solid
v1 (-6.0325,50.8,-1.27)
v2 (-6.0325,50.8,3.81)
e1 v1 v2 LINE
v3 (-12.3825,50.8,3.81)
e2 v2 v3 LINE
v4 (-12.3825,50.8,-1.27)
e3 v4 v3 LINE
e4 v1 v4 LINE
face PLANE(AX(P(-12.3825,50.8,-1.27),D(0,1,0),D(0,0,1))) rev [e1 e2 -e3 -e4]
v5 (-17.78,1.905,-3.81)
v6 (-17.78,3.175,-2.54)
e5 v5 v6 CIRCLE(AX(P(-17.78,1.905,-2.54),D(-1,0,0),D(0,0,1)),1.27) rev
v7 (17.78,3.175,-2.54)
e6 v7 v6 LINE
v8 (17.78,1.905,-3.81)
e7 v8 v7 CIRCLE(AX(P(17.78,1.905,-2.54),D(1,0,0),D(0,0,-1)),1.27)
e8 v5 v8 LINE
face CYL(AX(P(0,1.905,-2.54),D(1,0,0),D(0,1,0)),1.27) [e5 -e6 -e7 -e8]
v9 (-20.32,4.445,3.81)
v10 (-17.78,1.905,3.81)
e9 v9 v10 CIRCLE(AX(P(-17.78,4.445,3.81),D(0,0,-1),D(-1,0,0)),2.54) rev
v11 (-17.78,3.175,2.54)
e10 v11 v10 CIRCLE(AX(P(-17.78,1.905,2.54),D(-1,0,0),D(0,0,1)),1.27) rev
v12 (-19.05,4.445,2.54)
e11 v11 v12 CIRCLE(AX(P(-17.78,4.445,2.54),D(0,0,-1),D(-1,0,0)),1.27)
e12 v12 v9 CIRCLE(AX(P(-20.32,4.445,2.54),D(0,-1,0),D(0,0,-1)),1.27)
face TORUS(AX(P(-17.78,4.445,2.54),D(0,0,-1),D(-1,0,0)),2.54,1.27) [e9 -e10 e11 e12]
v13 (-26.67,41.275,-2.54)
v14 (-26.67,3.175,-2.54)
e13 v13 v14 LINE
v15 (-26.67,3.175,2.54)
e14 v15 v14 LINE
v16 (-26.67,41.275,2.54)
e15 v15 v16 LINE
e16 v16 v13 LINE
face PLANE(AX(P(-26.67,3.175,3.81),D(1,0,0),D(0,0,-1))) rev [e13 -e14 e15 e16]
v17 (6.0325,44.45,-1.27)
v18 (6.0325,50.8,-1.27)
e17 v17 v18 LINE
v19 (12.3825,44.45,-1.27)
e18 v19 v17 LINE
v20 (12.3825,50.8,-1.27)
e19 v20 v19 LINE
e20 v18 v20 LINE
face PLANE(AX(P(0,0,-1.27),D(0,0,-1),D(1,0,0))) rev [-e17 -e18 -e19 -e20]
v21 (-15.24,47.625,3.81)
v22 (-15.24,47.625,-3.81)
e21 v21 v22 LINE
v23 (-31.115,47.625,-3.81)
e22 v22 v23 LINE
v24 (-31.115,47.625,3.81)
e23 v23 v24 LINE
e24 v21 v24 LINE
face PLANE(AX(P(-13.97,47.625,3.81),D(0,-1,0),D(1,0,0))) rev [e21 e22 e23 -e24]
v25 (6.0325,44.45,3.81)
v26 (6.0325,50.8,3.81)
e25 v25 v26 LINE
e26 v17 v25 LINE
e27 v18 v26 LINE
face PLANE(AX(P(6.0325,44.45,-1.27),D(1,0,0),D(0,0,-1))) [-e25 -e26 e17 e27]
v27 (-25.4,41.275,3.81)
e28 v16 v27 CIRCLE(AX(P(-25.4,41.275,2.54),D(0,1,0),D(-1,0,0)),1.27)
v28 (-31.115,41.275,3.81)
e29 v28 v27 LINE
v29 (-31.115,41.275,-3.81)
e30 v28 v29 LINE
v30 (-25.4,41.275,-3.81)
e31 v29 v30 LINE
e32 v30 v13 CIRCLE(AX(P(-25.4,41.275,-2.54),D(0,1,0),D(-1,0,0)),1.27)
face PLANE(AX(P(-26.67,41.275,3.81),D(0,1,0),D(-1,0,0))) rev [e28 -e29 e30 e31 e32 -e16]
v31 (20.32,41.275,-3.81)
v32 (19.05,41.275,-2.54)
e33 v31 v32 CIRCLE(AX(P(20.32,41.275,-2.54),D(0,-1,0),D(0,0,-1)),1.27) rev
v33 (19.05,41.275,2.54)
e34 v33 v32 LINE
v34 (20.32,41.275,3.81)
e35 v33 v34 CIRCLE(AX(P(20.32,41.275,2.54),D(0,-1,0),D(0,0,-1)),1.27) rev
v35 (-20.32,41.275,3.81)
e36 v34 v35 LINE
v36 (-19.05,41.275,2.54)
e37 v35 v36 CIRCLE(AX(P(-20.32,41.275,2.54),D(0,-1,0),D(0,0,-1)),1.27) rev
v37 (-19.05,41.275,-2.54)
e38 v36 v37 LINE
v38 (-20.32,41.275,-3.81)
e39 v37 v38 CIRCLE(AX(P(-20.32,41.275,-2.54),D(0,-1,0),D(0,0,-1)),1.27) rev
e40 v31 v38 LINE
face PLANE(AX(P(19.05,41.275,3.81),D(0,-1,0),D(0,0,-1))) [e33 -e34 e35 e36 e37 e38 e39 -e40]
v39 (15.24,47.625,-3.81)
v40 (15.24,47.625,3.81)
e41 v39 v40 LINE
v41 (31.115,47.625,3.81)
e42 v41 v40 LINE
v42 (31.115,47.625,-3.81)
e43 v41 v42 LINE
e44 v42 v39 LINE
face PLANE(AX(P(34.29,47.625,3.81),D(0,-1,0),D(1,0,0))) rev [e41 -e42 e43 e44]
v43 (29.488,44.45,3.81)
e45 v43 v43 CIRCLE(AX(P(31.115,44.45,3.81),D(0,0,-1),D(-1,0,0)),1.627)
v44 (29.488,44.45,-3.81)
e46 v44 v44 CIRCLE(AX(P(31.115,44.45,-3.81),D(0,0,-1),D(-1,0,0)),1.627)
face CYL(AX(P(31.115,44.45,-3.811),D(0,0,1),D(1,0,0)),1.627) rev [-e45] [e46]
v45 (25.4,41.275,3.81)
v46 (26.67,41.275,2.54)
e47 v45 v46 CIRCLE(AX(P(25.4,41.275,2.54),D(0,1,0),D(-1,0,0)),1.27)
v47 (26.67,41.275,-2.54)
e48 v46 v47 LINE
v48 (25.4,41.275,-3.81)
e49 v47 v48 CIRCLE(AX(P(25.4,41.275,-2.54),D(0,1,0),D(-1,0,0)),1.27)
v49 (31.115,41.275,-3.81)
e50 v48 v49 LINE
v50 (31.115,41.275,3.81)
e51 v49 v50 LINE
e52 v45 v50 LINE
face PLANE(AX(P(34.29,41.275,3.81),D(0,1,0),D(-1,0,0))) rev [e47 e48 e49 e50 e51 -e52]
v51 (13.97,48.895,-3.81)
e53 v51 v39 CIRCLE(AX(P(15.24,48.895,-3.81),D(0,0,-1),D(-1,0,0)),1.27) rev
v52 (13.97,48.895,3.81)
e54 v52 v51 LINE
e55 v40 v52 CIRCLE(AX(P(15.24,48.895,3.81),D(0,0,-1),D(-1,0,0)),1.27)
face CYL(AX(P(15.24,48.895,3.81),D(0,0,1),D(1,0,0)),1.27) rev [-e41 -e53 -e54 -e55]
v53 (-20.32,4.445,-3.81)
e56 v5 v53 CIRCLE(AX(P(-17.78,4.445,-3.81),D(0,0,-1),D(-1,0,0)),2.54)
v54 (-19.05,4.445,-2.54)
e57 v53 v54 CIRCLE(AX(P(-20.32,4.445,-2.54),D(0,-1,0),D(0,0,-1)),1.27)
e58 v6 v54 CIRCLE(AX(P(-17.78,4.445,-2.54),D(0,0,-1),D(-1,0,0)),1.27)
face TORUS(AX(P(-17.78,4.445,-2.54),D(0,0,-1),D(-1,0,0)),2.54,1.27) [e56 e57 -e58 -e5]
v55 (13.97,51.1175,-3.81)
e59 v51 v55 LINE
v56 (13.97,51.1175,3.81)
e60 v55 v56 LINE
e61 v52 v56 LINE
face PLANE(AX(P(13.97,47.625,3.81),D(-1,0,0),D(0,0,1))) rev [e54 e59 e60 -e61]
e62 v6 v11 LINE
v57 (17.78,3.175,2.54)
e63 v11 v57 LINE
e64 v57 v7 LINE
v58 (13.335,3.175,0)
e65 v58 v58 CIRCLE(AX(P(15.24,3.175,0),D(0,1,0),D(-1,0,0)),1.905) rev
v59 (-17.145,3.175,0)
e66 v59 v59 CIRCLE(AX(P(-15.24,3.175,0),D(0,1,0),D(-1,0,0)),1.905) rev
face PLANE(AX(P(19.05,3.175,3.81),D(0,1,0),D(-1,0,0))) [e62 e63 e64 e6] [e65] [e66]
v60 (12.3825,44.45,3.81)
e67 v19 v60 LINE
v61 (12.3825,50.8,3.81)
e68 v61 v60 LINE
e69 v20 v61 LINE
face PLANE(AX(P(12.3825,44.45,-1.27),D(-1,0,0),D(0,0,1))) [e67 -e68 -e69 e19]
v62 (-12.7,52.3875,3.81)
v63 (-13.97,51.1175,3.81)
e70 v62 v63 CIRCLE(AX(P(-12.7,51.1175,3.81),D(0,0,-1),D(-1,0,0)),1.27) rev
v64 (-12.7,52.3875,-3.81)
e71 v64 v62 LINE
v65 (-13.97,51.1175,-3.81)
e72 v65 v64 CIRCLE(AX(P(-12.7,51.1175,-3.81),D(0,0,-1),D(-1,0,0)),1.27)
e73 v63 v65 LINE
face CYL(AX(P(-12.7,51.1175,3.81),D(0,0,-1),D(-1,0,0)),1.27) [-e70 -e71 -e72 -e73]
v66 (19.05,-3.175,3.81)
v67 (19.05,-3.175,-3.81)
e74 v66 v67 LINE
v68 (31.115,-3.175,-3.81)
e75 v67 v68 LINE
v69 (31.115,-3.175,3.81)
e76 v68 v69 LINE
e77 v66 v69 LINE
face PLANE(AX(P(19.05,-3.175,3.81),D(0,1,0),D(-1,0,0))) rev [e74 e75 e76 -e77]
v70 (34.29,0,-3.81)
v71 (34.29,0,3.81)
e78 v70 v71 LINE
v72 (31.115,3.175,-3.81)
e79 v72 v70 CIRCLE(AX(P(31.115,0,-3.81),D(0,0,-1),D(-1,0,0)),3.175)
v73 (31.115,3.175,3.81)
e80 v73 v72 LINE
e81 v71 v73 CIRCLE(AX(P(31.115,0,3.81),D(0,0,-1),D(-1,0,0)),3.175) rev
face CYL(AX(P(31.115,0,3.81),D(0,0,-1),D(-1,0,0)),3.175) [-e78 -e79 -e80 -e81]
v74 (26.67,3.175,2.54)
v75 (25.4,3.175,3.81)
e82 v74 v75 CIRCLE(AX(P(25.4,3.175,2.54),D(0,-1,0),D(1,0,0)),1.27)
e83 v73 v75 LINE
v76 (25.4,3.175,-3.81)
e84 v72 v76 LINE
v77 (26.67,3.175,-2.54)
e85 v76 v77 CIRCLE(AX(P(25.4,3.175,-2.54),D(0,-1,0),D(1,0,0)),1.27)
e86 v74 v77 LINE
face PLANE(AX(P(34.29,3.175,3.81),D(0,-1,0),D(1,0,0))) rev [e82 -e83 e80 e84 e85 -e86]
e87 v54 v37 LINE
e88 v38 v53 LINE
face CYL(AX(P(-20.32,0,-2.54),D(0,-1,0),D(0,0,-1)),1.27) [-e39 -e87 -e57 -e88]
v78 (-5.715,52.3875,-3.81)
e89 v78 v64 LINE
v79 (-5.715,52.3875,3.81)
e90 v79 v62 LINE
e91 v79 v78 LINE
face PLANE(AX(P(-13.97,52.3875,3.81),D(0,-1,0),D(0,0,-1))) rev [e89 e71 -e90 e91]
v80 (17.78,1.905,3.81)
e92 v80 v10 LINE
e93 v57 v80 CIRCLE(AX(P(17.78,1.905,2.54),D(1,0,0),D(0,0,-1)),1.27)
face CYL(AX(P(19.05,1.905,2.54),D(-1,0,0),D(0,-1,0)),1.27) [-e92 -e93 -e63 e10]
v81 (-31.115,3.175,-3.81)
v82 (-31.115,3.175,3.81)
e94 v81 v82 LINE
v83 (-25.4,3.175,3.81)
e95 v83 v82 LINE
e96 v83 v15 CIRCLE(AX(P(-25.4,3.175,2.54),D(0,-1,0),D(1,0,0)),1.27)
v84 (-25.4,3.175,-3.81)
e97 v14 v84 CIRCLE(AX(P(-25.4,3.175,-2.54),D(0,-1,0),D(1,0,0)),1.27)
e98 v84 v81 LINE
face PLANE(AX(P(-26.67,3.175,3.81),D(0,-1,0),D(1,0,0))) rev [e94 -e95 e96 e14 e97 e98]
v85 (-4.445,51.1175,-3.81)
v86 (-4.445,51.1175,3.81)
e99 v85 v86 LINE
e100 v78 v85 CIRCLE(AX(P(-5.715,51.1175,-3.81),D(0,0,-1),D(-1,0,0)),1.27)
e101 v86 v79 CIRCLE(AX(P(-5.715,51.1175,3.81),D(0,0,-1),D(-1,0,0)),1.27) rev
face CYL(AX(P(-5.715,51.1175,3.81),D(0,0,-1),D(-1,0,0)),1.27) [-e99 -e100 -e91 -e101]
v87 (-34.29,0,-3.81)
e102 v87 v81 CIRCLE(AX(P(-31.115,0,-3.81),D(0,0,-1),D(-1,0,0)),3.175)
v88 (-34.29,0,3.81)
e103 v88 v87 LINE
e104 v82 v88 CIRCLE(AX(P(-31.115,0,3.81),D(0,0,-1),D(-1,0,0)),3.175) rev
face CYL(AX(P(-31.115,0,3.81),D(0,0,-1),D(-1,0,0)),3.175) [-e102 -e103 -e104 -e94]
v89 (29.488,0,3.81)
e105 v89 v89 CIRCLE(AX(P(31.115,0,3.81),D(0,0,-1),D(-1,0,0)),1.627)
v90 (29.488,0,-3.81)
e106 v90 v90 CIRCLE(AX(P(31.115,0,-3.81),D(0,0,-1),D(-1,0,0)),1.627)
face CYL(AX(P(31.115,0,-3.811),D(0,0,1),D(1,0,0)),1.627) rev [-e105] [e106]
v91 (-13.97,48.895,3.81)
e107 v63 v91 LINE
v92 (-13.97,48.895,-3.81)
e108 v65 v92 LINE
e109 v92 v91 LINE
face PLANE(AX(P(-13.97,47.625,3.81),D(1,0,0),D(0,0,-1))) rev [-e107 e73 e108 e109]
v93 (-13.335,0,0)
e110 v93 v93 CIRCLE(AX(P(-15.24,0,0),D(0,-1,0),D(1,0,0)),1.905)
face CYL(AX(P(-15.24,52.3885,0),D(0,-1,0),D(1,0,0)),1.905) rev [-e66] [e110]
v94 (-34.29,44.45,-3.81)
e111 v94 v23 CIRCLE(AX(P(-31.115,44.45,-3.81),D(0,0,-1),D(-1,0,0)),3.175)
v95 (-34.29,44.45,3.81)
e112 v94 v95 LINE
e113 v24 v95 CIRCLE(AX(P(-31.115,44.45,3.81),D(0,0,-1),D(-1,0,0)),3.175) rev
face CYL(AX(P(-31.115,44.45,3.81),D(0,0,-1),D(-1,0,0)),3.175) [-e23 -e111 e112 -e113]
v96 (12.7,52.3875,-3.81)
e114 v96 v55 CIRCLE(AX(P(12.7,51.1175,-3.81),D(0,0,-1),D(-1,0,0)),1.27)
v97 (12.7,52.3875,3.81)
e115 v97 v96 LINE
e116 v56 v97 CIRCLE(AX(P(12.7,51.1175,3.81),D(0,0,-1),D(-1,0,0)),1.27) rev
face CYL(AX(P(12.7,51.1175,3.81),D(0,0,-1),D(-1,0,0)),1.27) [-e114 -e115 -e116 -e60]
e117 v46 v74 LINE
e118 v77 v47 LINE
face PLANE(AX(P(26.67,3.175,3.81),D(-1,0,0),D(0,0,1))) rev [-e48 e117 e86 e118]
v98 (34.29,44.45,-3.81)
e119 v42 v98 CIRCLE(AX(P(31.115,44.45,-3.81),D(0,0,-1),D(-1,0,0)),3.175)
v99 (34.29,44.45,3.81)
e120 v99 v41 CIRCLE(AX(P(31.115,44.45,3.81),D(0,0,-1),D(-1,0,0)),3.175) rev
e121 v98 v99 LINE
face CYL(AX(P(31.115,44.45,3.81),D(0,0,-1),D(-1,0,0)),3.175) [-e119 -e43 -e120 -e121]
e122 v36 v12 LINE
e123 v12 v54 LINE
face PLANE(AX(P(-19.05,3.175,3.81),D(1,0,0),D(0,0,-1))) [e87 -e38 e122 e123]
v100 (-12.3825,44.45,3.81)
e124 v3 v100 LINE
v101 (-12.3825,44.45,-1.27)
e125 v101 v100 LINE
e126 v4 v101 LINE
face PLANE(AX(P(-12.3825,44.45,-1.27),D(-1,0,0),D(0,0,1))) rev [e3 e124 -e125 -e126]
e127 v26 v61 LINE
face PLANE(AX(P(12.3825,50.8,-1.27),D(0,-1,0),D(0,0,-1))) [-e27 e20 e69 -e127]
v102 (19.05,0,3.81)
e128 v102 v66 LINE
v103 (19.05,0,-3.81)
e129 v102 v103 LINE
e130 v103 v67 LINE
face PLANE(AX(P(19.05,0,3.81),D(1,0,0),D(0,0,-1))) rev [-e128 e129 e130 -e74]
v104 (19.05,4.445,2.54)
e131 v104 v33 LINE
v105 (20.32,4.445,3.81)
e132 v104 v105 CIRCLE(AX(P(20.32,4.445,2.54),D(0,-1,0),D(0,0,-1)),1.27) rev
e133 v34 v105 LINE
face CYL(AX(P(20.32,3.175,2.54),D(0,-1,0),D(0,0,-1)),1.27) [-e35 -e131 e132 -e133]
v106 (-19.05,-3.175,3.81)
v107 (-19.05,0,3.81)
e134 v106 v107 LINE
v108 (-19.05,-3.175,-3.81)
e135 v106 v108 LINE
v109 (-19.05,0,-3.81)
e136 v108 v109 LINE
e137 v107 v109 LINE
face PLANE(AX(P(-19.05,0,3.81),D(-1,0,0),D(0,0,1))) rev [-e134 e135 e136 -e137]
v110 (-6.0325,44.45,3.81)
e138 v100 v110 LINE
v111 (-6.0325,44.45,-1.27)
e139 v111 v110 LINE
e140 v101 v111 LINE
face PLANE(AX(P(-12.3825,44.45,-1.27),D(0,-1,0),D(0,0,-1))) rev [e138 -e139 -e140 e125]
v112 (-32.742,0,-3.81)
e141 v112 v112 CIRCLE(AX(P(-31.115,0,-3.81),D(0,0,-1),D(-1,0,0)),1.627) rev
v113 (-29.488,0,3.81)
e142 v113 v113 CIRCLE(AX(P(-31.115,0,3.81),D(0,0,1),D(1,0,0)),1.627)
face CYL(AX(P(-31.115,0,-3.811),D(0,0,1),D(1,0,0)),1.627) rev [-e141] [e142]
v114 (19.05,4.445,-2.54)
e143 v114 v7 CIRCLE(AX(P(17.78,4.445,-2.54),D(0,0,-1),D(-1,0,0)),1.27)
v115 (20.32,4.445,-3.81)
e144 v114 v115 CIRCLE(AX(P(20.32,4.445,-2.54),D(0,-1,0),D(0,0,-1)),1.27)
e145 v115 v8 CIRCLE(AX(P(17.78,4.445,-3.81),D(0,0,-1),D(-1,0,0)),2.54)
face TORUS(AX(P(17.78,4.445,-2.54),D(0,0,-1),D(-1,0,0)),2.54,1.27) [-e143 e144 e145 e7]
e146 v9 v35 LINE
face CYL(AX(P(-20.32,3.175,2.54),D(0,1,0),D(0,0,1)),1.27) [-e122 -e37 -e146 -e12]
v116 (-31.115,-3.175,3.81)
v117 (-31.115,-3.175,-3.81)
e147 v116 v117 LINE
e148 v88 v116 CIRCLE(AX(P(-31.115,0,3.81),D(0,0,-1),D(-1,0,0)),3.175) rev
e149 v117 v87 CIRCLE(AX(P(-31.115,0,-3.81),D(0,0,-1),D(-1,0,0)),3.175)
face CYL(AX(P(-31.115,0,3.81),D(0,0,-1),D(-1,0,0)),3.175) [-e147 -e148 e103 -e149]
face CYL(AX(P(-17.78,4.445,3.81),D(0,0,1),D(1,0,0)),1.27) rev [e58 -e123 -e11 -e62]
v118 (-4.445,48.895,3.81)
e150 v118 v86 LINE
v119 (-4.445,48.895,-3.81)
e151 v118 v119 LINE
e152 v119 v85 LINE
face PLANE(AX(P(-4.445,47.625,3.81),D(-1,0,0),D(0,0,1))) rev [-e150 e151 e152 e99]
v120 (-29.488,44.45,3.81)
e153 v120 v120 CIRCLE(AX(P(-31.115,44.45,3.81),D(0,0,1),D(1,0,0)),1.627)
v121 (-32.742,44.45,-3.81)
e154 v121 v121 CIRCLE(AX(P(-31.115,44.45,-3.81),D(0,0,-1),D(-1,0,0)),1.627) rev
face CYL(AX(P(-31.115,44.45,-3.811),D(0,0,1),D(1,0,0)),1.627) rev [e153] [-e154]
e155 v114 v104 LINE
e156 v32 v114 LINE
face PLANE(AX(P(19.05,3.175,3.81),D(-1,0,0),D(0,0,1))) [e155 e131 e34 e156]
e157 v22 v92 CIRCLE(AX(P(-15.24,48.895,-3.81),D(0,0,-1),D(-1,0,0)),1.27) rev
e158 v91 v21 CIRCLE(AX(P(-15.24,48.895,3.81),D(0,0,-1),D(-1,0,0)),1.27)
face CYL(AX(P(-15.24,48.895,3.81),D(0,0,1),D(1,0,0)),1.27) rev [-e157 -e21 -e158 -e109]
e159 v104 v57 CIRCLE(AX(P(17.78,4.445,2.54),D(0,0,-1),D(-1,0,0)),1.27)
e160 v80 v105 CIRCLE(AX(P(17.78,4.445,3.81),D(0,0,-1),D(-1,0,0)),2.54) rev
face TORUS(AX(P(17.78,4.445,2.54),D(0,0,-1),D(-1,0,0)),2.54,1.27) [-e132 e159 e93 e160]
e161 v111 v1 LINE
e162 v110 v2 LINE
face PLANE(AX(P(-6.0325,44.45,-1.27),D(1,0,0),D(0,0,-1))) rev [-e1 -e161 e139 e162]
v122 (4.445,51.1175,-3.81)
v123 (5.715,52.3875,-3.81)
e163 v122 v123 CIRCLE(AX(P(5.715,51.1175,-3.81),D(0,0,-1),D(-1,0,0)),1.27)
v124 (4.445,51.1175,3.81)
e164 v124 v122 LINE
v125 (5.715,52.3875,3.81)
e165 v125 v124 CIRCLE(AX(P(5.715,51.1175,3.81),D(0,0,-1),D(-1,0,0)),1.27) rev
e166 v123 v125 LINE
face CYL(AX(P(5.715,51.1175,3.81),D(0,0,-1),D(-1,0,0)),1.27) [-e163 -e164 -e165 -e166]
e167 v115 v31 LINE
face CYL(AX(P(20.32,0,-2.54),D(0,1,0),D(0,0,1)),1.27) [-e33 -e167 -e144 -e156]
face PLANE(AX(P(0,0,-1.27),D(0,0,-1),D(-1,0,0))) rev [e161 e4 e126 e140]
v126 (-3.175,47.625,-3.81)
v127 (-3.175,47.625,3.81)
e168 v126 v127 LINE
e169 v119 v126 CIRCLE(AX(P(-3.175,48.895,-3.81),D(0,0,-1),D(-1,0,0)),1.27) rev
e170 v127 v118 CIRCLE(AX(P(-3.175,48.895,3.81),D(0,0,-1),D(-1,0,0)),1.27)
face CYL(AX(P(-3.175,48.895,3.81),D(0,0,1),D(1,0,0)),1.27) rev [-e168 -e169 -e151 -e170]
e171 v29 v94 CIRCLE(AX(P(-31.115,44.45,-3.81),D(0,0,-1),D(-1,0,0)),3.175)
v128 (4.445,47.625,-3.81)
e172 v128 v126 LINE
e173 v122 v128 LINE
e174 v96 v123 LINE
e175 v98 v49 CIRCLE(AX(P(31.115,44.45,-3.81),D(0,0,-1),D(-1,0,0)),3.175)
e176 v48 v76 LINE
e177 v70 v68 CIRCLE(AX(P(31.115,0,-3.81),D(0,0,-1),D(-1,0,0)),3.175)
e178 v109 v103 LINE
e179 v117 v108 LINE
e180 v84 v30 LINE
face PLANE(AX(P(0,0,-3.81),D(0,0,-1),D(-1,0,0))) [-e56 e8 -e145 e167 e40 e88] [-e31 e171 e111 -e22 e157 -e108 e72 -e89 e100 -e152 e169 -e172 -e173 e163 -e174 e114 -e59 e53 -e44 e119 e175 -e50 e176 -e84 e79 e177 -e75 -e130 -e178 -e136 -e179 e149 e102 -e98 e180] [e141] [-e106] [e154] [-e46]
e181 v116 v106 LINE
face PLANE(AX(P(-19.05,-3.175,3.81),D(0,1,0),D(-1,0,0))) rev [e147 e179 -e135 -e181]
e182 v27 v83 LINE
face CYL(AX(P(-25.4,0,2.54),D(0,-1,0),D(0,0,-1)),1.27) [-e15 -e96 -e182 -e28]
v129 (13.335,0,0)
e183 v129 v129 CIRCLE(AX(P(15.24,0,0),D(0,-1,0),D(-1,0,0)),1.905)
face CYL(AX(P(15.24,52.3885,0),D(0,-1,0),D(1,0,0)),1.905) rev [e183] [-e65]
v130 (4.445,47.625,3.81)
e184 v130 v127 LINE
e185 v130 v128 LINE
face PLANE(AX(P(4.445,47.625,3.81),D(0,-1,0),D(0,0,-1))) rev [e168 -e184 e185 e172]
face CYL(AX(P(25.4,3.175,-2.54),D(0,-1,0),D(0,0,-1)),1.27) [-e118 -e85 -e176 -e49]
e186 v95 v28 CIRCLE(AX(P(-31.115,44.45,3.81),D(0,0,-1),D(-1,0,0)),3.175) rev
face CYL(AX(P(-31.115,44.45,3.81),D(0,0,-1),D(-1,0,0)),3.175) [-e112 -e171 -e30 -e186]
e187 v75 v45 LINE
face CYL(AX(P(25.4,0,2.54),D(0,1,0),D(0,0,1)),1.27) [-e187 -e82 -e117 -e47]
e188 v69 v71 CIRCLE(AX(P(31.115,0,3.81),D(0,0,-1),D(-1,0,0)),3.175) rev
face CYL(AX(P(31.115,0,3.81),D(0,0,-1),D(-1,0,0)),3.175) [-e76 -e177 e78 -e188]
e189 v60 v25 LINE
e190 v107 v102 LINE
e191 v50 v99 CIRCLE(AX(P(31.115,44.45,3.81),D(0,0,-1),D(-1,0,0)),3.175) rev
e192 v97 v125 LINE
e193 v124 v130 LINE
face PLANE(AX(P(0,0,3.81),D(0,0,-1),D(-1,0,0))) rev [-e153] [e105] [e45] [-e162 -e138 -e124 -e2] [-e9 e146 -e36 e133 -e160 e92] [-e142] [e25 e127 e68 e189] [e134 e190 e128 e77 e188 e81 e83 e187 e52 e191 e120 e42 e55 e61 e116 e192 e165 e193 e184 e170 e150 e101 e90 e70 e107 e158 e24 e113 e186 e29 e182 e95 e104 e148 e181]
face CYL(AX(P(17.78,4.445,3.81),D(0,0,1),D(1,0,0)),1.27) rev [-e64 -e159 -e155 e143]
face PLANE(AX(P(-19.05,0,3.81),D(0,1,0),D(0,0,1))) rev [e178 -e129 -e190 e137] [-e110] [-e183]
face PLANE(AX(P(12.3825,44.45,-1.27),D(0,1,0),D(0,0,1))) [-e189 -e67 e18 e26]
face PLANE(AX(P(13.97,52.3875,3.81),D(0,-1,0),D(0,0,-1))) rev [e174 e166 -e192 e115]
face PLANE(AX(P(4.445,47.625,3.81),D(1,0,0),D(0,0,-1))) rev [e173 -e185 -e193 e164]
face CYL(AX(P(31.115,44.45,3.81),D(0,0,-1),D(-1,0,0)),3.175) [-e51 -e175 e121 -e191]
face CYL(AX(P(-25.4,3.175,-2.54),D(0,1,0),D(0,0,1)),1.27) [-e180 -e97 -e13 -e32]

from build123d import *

# Parameters (mm, degrees)
SKETCH3_W           = 38.1
SKETCH3_H           = 38.1
BOSS_EXTRUDE2_DEPTH = 3.81
FILLET1_R           = 3.175
CUT_EXTRUDE1_REACH  = 65.074
SKETCH4_R           = 1.627
FILLET2_R           = 1.27
CUT_EXTRUDE2_REACH  = 64.728
SKETCH5_R           = 1.905
SKETCH7_W           = 6.35
SKETCH7_H           = 6.35
CUT_EXTRUDE4_DEPTH  = 5.08


with BuildPart() as part:
    # Sketch3 → Boss-Extrude2 (new, symmetric)
    with BuildSketch(Plane.XY):
        Polygon((34.29, -3.175), (34.29, 3.175), (26.67, 3.175), (26.67, 41.275), (34.29, 41.275), (34.29, 47.625), (13.97, 47.625), (13.97, 52.3875), (4.445, 52.3875), (4.445, 47.625), (-4.445, 47.625), (-4.445, 52.3875), (-13.97, 52.3875), (-13.97, 47.625), (-34.29, 47.625), (-34.29, 41.275), (-26.67, 41.275), (-26.67, 3.175), (-34.29, 3.175), (-34.29, -3.175), (-19.05, -3.175), (-19.05, 0), (19.05, 0), (19.05, -3.175), align=None)
        with Locations((0, 22.225)):
            Rectangle(SKETCH3_W, SKETCH3_H, mode=Mode.SUBTRACT)
    extrude(amount=BOSS_EXTRUDE2_DEPTH, both=True)

    # Fillet1
    fillet1_edges = [part.edges().sort_by_distance(p)[0] for p in [
        (34.29, 3.175, 0),
        (34.29, 41.275, 0),
        (34.29, 47.625, 0),
        (-34.29, 3.175, 0),
        (-34.29, 41.275, 0),
        (34.29, -3.175, 0),
        (-34.29, -3.175, 0),
        (-34.29, 47.625, 0),
    ]]
    fillet(fillet1_edges, radius=FILLET1_R - 0.0001)  # a hair under: the kernel refuses the full size

    # Sketch4 → Cut-Extrude1 (cut, up to next)
    with BuildSketch(Plane.XY.offset(3.81), mode=Mode.PRIVATE) as cut_extrude1_sk1:
        with Locations((-31.115, 44.45)):
            Circle(SKETCH4_R)
    cut_extrude1_tool1 = extrude(cut_extrude1_sk1.sketch, amount=-CUT_EXTRUDE1_REACH, mode=Mode.PRIVATE) & part.part
    # Sketch4 → Cut-Extrude1 (cut, up to next)
    with BuildSketch(Plane.XY.offset(3.81), mode=Mode.PRIVATE) as cut_extrude1_sk2:
        with Locations((-31.115, 0)):
            Circle(SKETCH4_R)
    cut_extrude1_tool2 = extrude(cut_extrude1_sk2.sketch, amount=-CUT_EXTRUDE1_REACH, mode=Mode.PRIVATE) & part.part
    cut_extrude1_1 = cut_extrude1_tool1.solids().sort_by_distance((-31.115, 44.45, 3.81))[0]
    add(cut_extrude1_1, mode=Mode.SUBTRACT)
    cut_extrude1_2 = cut_extrude1_tool2.solids().sort_by_distance((-31.115, 0, 3.81))[0]
    add(cut_extrude1_2, mode=Mode.SUBTRACT)
    cut_extrude1 = cut_extrude1_1 + cut_extrude1_2  # Cut-Extrude1 as one shape, for the pattern or mirror that repeats it

    # Mirror1: Cut-Extrude1 across plane
    add(cut_extrude1.mirror(Plane(origin=(0, 0, 0), x_dir=(0, 0, 1), z_dir=(1, 0, 0))), mode=Mode.SUBTRACT)

    # Fillet2
    fillet2_edges = [part.edges().sort_by_distance(p)[0] for p in [
        (-26.67, 22.225, -3.81),
        (26.67, 22.225, -3.81),
        (-13.97, 47.625, 0),
        (-13.97, 52.3875, 0),
        (-4.445, 52.3875, 0),
        (-4.445, 47.625, 0),
        (4.445, 52.3875, 0),
        (13.97, 52.3875, 0),
        (26.67, 22.225, 3.81),
        (13.97, 47.625, 0),
        (-19.05, 22.225, -3.81),
        (0, 3.175, -3.81),
        (-19.05, 3.175, 0),
        (19.05, 22.225, -3.81),
        (19.05, 3.175, 0),
        (-19.05, 22.225, 3.81),
        (0, 3.175, 3.81),
        (19.05, 22.225, 3.81),
        (-26.67, 22.225, 3.81),
    ]]
    fillet(fillet2_edges, radius=FILLET2_R)

    # Sketch5 → Cut-Extrude2 (cut, up to next)
    with BuildSketch(Plane.XZ, mode=Mode.PRIVATE) as cut_extrude2_sk1:
        with Locations((-15.24, 0)):
            Circle(SKETCH5_R)
    cut_extrude2_tool1 = extrude(cut_extrude2_sk1.sketch, amount=-CUT_EXTRUDE2_REACH, mode=Mode.PRIVATE) & part.part
    # Sketch5 → Cut-Extrude2 (cut, up to next)
    with BuildSketch(Plane.XZ, mode=Mode.PRIVATE) as cut_extrude2_sk2:
        with Locations(Location((15.24, 0, 0), (0, 0, 180))):
            Circle(SKETCH5_R)
    cut_extrude2_tool2 = extrude(cut_extrude2_sk2.sketch, amount=-CUT_EXTRUDE2_REACH, mode=Mode.PRIVATE) & part.part
    add(cut_extrude2_tool1.solids().sort_by_distance((-15.24, 0, 0))[0], mode=Mode.SUBTRACT)
    add(cut_extrude2_tool2.solids().sort_by_distance((15.24, 0, 0))[0], mode=Mode.SUBTRACT)

    # Sketch7 → Cut-Extrude4 (cut)
    with BuildSketch(Plane.XY.offset(3.81)):
        with Locations((-9.2075, 47.625)):
            Rectangle(SKETCH7_W, SKETCH7_H)
    cut_extrude4 = extrude(amount=-CUT_EXTRUDE4_DEPTH, mode=Mode.SUBTRACT)

    # Mirror2: Cut-Extrude4 across plane
    add(cut_extrude4.mirror(Plane(origin=(0, 0, 0), x_dir=(0, 0, 1), z_dir=(1, 0, 0))), mode=Mode.SUBTRACT)


solid = part.part
